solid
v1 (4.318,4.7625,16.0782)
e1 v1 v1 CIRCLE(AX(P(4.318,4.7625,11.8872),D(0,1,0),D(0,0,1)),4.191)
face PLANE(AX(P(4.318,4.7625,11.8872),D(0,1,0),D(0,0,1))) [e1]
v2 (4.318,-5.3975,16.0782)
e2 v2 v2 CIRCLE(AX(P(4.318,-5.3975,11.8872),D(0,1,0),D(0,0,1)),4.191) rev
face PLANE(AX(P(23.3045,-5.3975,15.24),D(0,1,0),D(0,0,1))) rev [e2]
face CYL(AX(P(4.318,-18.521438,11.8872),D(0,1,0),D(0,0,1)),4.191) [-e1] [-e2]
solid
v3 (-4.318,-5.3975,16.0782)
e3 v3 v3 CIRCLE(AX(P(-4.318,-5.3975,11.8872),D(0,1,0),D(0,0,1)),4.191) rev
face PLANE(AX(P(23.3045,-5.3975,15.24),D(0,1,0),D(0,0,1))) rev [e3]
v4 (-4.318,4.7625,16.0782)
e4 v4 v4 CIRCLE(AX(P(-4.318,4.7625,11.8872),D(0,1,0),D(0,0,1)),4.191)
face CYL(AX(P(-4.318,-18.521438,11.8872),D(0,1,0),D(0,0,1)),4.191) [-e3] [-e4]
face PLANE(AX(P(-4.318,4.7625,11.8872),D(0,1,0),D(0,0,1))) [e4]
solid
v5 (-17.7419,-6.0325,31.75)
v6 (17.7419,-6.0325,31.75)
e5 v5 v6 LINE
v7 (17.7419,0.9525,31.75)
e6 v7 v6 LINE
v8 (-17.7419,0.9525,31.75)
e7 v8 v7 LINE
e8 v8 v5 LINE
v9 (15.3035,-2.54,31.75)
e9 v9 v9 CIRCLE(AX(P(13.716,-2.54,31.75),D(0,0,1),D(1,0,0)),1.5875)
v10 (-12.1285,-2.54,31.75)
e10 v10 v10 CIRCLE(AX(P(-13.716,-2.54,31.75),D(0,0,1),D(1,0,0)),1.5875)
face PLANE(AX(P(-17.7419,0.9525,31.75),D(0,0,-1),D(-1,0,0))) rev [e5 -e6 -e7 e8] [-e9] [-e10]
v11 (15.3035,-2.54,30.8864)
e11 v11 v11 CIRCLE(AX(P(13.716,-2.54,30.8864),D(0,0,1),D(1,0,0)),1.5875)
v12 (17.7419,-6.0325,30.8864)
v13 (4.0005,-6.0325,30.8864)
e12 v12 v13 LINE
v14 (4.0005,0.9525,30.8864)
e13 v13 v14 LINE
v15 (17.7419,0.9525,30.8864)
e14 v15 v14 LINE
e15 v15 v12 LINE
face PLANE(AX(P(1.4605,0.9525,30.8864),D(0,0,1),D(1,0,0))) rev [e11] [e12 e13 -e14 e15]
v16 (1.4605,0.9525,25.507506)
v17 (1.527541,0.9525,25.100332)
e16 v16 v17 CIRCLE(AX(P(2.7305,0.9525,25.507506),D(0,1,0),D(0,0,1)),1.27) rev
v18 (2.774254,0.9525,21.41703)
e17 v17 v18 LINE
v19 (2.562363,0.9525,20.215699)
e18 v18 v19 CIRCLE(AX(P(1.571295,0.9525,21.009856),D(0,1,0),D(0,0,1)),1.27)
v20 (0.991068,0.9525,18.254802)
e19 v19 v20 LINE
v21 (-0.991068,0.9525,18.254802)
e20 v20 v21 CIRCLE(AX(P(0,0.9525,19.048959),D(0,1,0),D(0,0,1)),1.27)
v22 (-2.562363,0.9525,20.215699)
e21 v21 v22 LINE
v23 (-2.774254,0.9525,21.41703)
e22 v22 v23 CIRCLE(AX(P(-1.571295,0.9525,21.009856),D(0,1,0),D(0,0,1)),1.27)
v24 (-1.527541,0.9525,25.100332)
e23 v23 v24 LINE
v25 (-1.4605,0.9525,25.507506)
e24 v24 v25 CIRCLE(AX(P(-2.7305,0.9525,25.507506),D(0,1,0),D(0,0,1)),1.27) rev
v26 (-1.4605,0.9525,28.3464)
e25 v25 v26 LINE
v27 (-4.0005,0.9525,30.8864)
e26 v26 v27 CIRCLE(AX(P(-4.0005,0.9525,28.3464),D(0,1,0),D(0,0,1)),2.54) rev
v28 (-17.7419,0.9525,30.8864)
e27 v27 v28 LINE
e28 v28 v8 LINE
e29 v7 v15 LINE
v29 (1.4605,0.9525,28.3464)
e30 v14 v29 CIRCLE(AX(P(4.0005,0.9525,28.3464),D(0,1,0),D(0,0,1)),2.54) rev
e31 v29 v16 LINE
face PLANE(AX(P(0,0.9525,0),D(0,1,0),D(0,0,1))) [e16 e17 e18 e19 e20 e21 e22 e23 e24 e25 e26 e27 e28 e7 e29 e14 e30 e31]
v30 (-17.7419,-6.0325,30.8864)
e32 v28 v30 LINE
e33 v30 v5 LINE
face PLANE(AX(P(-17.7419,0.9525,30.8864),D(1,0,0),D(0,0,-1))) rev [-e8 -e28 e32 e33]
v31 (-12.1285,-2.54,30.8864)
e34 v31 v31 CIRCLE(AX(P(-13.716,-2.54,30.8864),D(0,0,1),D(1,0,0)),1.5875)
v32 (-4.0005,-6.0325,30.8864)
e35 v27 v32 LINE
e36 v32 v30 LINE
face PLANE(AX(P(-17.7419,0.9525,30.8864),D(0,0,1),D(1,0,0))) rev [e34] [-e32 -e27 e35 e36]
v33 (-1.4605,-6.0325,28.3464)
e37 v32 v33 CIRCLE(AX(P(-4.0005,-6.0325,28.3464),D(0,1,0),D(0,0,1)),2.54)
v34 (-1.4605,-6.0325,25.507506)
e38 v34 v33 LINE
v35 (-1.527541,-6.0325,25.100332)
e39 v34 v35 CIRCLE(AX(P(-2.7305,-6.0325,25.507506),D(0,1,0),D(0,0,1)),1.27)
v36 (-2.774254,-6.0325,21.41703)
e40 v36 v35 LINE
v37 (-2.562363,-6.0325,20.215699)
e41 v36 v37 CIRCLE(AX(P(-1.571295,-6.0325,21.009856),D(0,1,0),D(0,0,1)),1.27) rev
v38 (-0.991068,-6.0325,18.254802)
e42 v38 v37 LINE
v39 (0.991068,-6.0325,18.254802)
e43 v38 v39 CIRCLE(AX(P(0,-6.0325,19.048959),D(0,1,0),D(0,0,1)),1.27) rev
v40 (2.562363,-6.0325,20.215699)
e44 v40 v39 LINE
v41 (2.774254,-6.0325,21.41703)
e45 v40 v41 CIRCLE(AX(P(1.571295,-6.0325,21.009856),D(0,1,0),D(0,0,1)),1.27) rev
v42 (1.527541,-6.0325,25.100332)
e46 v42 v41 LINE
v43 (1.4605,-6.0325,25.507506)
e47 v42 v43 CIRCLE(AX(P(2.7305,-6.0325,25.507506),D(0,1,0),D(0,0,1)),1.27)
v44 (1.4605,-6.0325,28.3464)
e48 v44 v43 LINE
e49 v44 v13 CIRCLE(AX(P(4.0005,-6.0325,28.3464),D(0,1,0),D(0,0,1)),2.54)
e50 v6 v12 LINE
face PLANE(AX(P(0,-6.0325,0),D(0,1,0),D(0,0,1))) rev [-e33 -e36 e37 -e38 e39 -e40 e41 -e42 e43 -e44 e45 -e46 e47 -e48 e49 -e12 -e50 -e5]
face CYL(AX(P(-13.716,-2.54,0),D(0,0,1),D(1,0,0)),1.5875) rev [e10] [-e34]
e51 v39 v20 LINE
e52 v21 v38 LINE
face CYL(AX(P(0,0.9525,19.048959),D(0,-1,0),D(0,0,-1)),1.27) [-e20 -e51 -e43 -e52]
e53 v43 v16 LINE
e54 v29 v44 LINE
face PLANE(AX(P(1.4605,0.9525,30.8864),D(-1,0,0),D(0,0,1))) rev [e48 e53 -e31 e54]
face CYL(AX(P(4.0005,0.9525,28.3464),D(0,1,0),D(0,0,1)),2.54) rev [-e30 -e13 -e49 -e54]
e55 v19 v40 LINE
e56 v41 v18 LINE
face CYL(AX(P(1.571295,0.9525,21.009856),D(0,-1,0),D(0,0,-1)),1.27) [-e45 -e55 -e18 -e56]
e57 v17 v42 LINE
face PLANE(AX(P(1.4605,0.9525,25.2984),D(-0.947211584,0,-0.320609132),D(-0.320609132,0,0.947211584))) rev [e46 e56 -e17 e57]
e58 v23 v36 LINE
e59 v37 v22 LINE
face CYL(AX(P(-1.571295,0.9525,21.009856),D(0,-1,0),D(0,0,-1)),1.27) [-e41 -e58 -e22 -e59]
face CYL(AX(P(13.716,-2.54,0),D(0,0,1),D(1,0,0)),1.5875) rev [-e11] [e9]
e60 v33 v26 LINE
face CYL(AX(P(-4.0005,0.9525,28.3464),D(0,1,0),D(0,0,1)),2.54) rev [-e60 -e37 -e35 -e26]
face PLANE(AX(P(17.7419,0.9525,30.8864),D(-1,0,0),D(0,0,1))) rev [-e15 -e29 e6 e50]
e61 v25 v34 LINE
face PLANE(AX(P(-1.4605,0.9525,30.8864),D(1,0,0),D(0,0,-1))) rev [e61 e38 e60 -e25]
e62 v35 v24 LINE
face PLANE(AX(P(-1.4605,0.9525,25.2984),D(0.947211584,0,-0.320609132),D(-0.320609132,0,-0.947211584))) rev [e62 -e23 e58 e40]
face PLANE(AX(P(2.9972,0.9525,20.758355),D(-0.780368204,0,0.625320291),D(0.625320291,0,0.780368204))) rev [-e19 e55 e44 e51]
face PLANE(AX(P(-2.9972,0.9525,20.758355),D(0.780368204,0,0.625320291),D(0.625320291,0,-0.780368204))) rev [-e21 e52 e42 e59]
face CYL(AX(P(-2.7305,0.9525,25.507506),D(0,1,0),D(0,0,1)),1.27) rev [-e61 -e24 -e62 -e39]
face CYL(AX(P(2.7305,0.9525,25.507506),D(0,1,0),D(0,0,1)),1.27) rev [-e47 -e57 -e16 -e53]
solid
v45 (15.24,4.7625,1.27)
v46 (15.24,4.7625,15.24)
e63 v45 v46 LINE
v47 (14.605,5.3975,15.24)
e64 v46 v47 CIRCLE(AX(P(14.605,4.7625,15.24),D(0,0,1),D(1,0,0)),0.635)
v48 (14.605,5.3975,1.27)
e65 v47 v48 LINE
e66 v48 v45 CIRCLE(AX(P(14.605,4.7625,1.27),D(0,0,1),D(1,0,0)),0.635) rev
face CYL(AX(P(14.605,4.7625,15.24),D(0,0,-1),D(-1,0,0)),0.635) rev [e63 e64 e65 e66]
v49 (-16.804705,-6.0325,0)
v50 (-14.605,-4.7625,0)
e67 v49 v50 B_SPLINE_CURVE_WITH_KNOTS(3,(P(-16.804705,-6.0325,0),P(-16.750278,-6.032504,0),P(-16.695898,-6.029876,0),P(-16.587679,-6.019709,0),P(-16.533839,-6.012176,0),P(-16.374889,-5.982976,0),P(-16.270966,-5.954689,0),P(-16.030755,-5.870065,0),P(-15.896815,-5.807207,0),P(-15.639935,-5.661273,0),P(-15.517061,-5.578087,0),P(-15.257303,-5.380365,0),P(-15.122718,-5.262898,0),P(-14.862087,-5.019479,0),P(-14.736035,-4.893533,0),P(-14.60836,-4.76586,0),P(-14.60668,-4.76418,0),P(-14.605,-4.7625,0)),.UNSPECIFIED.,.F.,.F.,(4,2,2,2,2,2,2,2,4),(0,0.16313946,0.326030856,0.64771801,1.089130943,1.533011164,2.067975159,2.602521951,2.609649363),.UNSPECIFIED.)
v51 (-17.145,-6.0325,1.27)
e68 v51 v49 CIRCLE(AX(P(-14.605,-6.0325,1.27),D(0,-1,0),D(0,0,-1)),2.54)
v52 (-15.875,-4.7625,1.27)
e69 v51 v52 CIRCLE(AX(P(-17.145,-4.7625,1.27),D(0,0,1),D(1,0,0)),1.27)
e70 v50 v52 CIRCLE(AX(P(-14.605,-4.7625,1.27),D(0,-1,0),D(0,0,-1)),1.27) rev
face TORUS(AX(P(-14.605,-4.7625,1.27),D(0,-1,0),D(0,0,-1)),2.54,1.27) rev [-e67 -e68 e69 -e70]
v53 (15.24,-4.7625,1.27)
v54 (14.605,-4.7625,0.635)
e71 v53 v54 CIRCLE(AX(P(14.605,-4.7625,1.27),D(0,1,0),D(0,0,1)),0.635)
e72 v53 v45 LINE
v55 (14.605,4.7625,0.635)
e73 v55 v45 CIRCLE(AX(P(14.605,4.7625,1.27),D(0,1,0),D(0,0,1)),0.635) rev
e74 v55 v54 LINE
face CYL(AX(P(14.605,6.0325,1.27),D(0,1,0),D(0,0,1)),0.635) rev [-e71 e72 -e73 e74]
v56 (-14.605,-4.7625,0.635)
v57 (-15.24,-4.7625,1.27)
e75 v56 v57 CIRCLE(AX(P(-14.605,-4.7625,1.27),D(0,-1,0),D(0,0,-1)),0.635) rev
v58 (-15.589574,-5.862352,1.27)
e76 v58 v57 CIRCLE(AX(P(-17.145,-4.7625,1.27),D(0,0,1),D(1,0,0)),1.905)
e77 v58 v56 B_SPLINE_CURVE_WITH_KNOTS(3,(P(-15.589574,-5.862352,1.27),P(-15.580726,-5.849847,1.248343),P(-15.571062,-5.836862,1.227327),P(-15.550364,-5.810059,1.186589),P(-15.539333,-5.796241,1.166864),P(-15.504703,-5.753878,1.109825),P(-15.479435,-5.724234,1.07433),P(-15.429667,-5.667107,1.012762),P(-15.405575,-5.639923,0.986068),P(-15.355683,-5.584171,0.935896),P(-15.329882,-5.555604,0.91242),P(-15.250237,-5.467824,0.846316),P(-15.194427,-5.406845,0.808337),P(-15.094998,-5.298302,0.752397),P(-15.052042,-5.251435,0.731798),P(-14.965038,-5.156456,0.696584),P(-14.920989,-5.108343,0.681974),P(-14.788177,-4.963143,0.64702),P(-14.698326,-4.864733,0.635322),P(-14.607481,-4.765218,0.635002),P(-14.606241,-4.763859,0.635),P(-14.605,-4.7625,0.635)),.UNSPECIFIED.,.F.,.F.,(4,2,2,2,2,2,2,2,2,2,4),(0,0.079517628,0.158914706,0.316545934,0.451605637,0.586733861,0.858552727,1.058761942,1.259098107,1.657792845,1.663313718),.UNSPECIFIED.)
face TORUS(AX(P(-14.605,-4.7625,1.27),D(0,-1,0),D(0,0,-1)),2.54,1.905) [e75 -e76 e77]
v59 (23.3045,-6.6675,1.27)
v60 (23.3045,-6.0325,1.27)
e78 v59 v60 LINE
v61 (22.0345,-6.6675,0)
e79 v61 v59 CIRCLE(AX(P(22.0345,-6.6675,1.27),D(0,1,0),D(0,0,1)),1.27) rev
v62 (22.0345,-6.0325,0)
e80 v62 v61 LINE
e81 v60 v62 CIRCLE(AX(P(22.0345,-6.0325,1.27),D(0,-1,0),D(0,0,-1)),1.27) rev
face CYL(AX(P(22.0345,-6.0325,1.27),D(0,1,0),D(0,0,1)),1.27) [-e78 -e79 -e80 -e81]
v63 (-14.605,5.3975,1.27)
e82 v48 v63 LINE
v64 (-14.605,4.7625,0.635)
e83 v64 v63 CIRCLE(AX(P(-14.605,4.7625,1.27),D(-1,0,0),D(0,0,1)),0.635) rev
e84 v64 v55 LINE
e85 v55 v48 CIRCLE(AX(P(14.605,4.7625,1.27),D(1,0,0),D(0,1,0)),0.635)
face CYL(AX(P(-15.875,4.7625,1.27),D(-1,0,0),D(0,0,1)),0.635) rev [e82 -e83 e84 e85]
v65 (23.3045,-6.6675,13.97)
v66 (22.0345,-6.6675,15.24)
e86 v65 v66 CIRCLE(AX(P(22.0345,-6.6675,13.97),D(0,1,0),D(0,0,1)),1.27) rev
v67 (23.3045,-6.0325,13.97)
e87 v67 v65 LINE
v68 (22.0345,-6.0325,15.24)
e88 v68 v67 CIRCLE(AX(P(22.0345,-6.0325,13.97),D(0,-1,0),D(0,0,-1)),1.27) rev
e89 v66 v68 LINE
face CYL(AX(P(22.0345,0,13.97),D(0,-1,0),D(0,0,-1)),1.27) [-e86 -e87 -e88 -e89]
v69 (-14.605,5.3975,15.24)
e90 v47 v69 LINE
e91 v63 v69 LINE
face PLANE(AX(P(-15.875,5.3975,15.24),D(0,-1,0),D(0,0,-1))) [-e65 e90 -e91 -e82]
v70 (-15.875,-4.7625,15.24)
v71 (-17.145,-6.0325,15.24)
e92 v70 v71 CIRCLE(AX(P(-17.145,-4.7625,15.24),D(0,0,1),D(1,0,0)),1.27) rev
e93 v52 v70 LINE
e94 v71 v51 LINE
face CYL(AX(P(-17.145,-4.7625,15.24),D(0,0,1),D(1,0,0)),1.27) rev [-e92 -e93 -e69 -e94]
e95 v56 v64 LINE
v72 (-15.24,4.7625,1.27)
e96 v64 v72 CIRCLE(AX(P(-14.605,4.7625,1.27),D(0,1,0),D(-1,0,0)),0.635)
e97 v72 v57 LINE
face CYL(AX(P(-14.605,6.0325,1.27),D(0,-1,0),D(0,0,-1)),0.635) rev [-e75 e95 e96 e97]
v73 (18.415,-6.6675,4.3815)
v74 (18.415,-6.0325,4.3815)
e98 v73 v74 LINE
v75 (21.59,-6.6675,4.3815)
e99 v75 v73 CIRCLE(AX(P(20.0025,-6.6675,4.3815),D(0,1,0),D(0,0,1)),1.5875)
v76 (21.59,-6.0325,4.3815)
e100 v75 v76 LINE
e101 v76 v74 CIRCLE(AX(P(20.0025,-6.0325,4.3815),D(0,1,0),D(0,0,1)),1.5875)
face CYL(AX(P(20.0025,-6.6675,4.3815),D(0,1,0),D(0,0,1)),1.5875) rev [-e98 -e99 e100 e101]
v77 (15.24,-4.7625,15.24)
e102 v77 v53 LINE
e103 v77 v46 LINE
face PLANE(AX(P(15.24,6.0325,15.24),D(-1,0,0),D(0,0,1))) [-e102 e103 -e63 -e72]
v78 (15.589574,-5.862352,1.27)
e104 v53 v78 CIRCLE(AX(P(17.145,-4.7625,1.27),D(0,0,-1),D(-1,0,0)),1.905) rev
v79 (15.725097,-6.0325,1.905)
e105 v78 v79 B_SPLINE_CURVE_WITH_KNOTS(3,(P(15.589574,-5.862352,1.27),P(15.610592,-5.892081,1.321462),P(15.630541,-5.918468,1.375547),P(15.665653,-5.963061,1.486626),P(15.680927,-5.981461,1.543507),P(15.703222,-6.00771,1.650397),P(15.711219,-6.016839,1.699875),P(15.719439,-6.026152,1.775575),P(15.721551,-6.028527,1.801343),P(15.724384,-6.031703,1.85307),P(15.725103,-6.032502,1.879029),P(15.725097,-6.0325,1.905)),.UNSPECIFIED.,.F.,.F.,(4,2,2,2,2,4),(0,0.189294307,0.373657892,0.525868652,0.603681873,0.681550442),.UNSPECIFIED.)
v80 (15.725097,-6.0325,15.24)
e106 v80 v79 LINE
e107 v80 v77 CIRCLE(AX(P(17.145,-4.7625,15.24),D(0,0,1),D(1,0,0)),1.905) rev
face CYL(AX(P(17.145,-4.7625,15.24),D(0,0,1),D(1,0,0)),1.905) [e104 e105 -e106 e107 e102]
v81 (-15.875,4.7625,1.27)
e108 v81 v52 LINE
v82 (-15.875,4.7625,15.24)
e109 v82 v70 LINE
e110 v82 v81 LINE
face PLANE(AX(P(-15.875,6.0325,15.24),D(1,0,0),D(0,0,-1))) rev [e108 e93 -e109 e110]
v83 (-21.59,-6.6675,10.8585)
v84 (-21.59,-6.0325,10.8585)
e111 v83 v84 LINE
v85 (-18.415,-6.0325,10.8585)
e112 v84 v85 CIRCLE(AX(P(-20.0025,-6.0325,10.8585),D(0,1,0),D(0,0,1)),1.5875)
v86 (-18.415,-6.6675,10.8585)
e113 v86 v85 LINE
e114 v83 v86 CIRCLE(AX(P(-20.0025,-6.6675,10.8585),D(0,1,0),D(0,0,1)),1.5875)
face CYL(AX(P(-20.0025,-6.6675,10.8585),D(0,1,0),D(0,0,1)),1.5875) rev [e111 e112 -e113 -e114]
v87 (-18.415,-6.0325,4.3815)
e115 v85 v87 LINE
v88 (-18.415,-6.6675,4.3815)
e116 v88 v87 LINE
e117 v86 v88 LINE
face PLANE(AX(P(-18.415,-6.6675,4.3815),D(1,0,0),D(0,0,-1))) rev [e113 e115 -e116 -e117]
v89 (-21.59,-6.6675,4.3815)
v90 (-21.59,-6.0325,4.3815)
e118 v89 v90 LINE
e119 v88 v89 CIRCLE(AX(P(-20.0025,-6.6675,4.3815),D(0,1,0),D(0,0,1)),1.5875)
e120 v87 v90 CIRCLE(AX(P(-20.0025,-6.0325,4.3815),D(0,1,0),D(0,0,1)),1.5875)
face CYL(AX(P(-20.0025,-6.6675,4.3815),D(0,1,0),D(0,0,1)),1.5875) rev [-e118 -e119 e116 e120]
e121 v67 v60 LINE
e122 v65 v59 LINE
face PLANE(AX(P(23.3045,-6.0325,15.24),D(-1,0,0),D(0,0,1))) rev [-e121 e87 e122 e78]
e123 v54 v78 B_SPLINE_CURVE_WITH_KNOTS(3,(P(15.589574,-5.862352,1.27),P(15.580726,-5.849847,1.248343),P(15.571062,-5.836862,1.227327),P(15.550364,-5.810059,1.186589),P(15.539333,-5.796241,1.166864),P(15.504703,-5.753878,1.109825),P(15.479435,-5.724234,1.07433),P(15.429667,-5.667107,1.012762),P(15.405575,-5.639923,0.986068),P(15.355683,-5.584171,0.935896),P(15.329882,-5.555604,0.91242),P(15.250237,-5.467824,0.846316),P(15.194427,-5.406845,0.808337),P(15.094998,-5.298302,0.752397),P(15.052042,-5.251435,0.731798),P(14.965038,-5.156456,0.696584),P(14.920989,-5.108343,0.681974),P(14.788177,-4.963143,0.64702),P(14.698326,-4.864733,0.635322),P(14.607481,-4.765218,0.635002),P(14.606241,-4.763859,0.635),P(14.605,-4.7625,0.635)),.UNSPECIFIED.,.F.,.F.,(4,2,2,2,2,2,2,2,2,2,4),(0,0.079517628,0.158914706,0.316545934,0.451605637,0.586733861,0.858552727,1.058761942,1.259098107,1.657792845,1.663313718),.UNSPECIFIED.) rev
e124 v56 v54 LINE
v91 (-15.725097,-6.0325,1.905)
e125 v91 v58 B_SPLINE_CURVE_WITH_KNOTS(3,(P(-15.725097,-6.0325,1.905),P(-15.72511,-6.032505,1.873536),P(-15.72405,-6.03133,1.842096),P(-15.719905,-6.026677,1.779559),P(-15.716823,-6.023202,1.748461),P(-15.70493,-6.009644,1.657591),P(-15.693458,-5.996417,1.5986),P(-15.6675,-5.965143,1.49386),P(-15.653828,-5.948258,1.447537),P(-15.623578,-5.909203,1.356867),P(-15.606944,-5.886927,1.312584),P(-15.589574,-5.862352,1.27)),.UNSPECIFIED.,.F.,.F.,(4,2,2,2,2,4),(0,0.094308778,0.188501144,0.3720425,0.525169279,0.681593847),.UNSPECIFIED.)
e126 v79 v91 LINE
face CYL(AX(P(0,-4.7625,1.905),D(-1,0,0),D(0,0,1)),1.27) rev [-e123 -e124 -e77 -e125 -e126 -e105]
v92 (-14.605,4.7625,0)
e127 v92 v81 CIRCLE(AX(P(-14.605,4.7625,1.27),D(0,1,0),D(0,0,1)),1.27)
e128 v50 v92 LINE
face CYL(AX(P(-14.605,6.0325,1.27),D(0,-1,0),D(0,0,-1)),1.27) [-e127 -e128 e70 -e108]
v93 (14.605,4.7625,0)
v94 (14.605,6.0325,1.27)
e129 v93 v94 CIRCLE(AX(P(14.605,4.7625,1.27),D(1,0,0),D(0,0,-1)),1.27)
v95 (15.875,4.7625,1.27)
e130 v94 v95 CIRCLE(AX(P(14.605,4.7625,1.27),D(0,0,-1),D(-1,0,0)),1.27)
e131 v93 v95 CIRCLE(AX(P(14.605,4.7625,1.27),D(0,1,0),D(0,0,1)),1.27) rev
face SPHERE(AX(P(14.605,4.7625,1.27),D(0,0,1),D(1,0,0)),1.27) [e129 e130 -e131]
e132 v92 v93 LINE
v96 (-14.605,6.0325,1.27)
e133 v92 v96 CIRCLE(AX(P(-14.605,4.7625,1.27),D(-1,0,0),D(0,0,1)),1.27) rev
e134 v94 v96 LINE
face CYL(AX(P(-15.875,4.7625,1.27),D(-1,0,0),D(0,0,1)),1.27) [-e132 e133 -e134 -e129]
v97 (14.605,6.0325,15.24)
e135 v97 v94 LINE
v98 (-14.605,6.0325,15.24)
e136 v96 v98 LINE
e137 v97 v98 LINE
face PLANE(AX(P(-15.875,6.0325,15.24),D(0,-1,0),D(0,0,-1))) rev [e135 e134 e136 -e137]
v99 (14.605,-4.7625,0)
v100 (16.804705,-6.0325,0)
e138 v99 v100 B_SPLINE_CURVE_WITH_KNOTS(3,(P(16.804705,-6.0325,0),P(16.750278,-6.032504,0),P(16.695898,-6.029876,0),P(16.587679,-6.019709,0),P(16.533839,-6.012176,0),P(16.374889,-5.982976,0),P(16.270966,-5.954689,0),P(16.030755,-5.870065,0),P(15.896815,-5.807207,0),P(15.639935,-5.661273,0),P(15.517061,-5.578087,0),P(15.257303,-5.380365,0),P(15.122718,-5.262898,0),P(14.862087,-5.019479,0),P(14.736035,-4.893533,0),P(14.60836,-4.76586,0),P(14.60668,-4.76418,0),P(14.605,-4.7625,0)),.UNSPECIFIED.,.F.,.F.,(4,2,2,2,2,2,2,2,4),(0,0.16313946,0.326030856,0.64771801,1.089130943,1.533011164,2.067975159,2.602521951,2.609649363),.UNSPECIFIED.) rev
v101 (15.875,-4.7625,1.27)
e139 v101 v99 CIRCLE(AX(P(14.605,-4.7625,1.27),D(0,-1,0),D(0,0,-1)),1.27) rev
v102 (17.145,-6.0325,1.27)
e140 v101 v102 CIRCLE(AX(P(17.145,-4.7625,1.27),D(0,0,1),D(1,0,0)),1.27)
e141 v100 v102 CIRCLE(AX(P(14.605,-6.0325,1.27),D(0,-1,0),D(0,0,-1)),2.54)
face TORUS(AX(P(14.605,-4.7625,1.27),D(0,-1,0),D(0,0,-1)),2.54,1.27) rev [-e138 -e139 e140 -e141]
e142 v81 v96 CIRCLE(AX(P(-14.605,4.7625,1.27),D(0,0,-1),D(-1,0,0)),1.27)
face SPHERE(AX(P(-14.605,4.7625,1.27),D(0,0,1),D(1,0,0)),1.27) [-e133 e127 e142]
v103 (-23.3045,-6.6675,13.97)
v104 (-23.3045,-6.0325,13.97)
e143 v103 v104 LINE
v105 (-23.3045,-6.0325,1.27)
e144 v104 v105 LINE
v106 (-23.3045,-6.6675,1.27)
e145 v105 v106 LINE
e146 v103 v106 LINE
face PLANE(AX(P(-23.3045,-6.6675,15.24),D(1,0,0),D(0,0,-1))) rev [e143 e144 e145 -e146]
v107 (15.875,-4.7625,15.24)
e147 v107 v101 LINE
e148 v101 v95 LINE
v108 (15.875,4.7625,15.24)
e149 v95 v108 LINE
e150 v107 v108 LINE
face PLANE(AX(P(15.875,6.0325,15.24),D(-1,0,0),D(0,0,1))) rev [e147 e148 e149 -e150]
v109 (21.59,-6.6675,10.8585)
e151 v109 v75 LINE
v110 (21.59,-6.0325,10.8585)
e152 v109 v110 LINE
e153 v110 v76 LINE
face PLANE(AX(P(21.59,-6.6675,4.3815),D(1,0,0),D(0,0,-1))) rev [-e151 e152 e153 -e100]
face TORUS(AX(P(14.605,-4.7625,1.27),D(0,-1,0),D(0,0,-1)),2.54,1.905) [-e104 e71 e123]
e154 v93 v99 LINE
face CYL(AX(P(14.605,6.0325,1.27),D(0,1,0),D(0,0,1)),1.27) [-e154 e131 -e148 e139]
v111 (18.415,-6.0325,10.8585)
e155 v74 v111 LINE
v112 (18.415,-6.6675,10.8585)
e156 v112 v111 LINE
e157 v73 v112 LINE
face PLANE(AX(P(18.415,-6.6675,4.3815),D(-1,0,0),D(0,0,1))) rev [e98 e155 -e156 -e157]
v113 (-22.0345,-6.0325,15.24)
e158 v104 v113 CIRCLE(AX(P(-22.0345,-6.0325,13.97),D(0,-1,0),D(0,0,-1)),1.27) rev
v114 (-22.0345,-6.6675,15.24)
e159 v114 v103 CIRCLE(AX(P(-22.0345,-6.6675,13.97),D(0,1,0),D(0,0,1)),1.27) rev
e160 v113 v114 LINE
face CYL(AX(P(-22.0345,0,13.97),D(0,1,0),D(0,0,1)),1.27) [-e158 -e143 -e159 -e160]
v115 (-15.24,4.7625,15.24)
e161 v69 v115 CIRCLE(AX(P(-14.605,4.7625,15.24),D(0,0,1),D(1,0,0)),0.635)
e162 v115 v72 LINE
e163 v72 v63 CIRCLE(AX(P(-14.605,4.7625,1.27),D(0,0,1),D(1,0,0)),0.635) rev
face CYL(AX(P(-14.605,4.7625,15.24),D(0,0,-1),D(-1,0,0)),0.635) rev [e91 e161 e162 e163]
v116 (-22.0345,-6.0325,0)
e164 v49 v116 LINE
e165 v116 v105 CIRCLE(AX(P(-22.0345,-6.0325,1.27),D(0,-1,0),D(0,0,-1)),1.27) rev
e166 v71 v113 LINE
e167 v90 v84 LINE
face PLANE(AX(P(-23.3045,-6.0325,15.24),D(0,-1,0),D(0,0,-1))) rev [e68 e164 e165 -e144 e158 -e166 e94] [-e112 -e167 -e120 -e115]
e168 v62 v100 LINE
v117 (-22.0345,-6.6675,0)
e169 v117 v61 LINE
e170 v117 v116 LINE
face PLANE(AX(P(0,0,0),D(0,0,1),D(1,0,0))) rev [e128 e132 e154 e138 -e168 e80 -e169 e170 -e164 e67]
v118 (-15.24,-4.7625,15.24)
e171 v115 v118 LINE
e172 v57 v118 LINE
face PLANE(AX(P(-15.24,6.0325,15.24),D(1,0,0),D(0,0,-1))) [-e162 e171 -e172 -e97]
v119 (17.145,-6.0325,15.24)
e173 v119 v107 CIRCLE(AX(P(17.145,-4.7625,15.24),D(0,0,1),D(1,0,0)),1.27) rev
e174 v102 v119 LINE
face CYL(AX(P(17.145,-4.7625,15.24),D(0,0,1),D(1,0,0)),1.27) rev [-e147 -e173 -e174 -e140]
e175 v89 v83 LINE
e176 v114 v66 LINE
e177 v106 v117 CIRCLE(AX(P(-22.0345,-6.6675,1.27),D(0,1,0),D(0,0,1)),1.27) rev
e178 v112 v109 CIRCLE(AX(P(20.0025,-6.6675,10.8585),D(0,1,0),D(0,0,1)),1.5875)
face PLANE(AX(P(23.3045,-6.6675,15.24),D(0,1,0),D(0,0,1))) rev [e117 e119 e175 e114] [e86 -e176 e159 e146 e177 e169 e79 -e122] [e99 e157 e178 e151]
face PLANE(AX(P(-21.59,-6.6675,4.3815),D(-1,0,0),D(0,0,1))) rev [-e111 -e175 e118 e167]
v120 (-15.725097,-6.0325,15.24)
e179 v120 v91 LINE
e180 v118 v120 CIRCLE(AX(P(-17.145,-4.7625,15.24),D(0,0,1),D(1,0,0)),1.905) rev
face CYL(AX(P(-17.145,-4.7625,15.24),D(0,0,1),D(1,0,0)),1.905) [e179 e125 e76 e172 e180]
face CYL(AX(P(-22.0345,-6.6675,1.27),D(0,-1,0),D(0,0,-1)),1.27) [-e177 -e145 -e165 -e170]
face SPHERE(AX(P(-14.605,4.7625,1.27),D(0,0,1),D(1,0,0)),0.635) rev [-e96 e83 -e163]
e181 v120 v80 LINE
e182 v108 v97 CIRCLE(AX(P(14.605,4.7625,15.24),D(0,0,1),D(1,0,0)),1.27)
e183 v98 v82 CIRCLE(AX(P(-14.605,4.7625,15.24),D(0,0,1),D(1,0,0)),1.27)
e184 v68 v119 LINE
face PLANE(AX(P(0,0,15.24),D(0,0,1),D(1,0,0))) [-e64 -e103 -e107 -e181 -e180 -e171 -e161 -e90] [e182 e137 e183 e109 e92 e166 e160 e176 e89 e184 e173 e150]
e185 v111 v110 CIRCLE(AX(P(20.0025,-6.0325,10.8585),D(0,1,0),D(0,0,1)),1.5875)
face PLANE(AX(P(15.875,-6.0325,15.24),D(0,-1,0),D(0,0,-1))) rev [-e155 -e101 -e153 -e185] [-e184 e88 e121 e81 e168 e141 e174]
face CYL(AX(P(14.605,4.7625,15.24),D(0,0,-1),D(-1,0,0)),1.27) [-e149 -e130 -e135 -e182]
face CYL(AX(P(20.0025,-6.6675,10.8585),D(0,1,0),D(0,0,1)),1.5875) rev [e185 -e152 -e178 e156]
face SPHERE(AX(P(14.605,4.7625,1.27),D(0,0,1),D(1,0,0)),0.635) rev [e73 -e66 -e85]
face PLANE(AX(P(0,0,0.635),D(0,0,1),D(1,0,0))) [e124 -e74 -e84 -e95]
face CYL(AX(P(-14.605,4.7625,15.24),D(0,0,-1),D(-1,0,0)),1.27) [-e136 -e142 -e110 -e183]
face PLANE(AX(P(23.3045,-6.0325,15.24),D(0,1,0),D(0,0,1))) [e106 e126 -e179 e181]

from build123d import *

# Parameters (mm, degrees)
BOSS_EXTRUDE1_DEPTH   = 15.24
FILLET1_R             = 1.27
FILLET3_R             = 1.27
FILLET2_R             = 1.27
CUT_EXTRUDE1_DEPTH    = 31.346689198
BOSS_EXTRUDE2_START   = -1.27
SKETCH4_R             = 4.191
BOSS_EXTRUDE2_DEPTH   = 10.16
BOSS_EXTRUDE2_2_DEPTH = 10.16
SHELL1_T              = -0.635
FILLET6_R             = 1.27
BOSS_EXTRUDE3_DEPTH   = 6.985
FILLET7_R             = 2.54
FILLET8_R             = 1.27
SKETCH6_R             = 1.5875
CUT_EXTRUDE2_DEPTH    = 40.945184743


with BuildPart() as part:
    # Sketch2 → Boss-Extrude1 (new body)
    with BuildSketch(Plane.XY):
        Polygon((15.875, -6.0325), (23.3045, -6.0325), (23.3045, -6.6675), (-23.3045, -6.6675), (-23.3045, -6.0325), (-15.875, -6.0325), (-15.875, 6.0325), (15.875, 6.0325), align=None)
    extrude(amount=BOSS_EXTRUDE1_DEPTH)

    # Fillet1
    fillet1_edges = [part.edges().sort_by_distance(p)[0] for p in [
        (-23.3045, -6.35, 15.24),
        (23.3045, -6.35, 15.24),
        (23.3045, -6.35, 0),
        (-23.3045, -6.35, 0),
    ]]
    fillet(fillet1_edges, radius=FILLET1_R)

    # Fillet3
    fillet3_edges = [part.edges().sort_by_distance(p)[0] for p in [
        (0, 6.0325, 0),
        (15.875, 0, 0),
        (-15.875, 6.0325, 7.62),
        (15.875, 6.0325, 7.62),
        (-15.875, 0, 0),
    ]]
    fillet(fillet3_edges, radius=FILLET3_R)

    # Fillet2
    # the kernel refuses this fillet: 1.27 mm, written as the material it adds along each edge
    with BuildSketch(Plane(origin=(15.875, -6.0325, 1.27), x_dir=(1, 0, 0), z_dir=(0, 0, 1)), Plane(origin=(-15.875, -6.0325, 1.27), x_dir=(0, 1, 0), z_dir=(0, 0, 1))) as fillet2_piece_1:
        with BuildLine():
            CenterArc((FILLET2_R, FILLET2_R), FILLET2_R, 180, 90)
            Line((0, FILLET2_R), (0, 0))
            Line((0, 0), (FILLET2_R, 0))
        make_face()
    extrude(amount=13.97)
    with BuildSketch(Plane(origin=(14.605, -6.0325, 1.27), x_dir=(-0.5976672776328289, 0, 0.8017442392976473), z_dir=(0.8017442392976473, 0, 0.5976672776328289))) as fillet2_piece_2_section:
        with BuildLine():
            CenterArc((1.27 + FILLET2_R, -FILLET2_R), FILLET2_R, 90, 90)
            Line((1.27, -FILLET2_R), (1.27, 0))
            Line((1.27, 0), (1.27 + FILLET2_R, 0))
        make_face()
    fillet2_piece_2 = revolve(axis=Axis((14.605, -6.0325, 1.27), (0, -1, 0)), revolution_arc=233.296989237, mode=Mode.PRIVATE)
    fillet2_piece_2 = split(fillet2_piece_2, bisect_by=Plane(origin=(15.557422349, -5.636731762, 0), z_dir=(0, 0, 1)), keep=Keep.TOP, mode=Mode.PRIVATE)
    add(fillet2_piece_2)
    with BuildSketch(Plane(origin=(-14.605, -6.0325, 1.27), x_dir=(0.5976672776328275, 0, 0.8017442392976483), z_dir=(-0.8017442392976483, 0, 0.5976672776328275))) as fillet2_piece_3_section:
        with BuildLine():
            CenterArc((1.27 + FILLET2_R, FILLET2_R), FILLET2_R, 180, 90)
            Line((1.27 + FILLET2_R, 0), (1.27, 0))
            Line((1.27, 0), (1.27, FILLET2_R))
        make_face()
    fillet2_piece_3 = revolve(axis=Axis((-14.605, -6.0325, 1.27), (0, 1, 0)), revolution_arc=233.296989237, mode=Mode.PRIVATE)
    fillet2_piece_3 = split(fillet2_piece_3, bisect_by=Plane(origin=(-15.557422462, -5.636732056, 0), z_dir=(0, 0, 1)), keep=Keep.TOP, mode=Mode.PRIVATE)
    add(fillet2_piece_3)

    # Sketch3 → Cut-Extrude1 (cut, through all)
    with BuildSketch(Plane(origin=(0, -6.0325, 0), x_dir=(1, 0, 0), z_dir=(0, 1, 0))):
        with BuildLine():
            Line((-18.415, -4.3815), (-18.415, -10.8585))
            ThreePointArc((-18.415, -10.8585), (-20.0025, -12.446), (-21.59, -10.8585))
            Line((-21.59, -10.8585), (-21.59, -4.3815))
            ThreePointArc((-21.59, -4.3815), (-20.0025, -2.794), (-18.415, -4.3815))
        make_face()
        with BuildLine():
            Line((21.59, -4.3815), (21.59, -10.8585))
            ThreePointArc((21.59, -10.8585), (20.0025, -12.446), (18.415, -10.8585))
            Line((18.415, -10.8585), (18.415, -4.3815))
            ThreePointArc((18.415, -4.3815), (20.0025, -2.794), (21.59, -4.3815))
        make_face()
    extrude(amount=-CUT_EXTRUDE1_DEPTH, mode=Mode.SUBTRACT)

    # Shell1
    shell1_openings = [part.faces().sort_by_distance(p)[0] for p in [
        (0, -0.451666987, 15.24),
    ]]
    offset(amount=SHELL1_T, openings=shell1_openings)

    # Fillet6
    fillet6_edges = [part.edges().sort_by_distance(p)[0] for p in [
        (0, -6.0325, 0.635),
    ]]
    fillet(fillet6_edges, radius=FILLET6_R)


with BuildPart() as body_2:
    # Sketch4 → Boss-Extrude2 (new body)
    with BuildSketch(Plane(origin=(0, 6.0325, 0), x_dir=(1, 0, 0), z_dir=(0, 1, 0)).offset(BOSS_EXTRUDE2_START)):
        with Locations(Location((-4.318, -11.8872, 0), (0, 0, 270))):
            Circle(SKETCH4_R)
    extrude(amount=-BOSS_EXTRUDE2_DEPTH)


with BuildPart() as body_3:
    # Sketch4 → Boss-Extrude2 2 (new body)
    with BuildSketch(Plane(origin=(0, 6.0325, 0), x_dir=(1, 0, 0), z_dir=(0, 1, 0)).offset(BOSS_EXTRUDE2_START)):
        with Locations(Location((4.318, -11.8872, 0), (0, 0, 270))):
            Circle(SKETCH4_R)
    extrude(amount=-BOSS_EXTRUDE2_2_DEPTH)


with BuildPart() as body_4:
    # Sketch5 → Boss-Extrude3 (new body)
    with BuildSketch(Plane(origin=(0, -6.0325, 0), x_dir=(1, 0, 0), z_dir=(0, 1, 0))):
        Polygon((-1.4605, -30.8864), (-1.4605, -25.2984), (-2.9972, -20.758354525), (0, -17.018), (2.9972, -20.758354525), (1.4605, -25.2984), (1.4605, -30.8864), (17.7419, -30.8864), (17.7419, -31.75), (-17.7419, -31.75), (-17.7419, -30.8864), align=None)
    extrude(amount=BOSS_EXTRUDE3_DEPTH)

    # Fillet7
    fillet7_edges = [body_4.edges().sort_by_distance(p)[0] for p in [
        (-1.4605, -2.54, 30.8864),
        (1.4605, -2.54, 30.8864),
    ]]
    fillet(fillet7_edges, radius=FILLET7_R)

    # Fillet8
    fillet8_edges = [body_4.edges().sort_by_distance(p)[0] for p in [
        (-1.4605, -2.54, 25.2984),
        (-2.9972, -2.54, 20.758354525),
        (0, -2.54, 17.018),
        (2.9972, -2.54, 20.758354525),
        (1.4605, -2.54, 25.2984),
    ]]
    fillet(fillet8_edges, radius=FILLET8_R)

    # Sketch6 → Cut-Extrude2 (cut, through all)
    with BuildSketch(Plane.XY.offset(31.75)):
        with Locations((-13.716, -2.54)):
            Circle(SKETCH6_R)
        with Locations((13.716, -2.54)):
            Circle(SKETCH6_R)
    extrude(amount=-CUT_EXTRUDE2_DEPTH, mode=Mode.SUBTRACT)


solid = Compound([part.part, body_2.part, body_3.part, body_4.part])
